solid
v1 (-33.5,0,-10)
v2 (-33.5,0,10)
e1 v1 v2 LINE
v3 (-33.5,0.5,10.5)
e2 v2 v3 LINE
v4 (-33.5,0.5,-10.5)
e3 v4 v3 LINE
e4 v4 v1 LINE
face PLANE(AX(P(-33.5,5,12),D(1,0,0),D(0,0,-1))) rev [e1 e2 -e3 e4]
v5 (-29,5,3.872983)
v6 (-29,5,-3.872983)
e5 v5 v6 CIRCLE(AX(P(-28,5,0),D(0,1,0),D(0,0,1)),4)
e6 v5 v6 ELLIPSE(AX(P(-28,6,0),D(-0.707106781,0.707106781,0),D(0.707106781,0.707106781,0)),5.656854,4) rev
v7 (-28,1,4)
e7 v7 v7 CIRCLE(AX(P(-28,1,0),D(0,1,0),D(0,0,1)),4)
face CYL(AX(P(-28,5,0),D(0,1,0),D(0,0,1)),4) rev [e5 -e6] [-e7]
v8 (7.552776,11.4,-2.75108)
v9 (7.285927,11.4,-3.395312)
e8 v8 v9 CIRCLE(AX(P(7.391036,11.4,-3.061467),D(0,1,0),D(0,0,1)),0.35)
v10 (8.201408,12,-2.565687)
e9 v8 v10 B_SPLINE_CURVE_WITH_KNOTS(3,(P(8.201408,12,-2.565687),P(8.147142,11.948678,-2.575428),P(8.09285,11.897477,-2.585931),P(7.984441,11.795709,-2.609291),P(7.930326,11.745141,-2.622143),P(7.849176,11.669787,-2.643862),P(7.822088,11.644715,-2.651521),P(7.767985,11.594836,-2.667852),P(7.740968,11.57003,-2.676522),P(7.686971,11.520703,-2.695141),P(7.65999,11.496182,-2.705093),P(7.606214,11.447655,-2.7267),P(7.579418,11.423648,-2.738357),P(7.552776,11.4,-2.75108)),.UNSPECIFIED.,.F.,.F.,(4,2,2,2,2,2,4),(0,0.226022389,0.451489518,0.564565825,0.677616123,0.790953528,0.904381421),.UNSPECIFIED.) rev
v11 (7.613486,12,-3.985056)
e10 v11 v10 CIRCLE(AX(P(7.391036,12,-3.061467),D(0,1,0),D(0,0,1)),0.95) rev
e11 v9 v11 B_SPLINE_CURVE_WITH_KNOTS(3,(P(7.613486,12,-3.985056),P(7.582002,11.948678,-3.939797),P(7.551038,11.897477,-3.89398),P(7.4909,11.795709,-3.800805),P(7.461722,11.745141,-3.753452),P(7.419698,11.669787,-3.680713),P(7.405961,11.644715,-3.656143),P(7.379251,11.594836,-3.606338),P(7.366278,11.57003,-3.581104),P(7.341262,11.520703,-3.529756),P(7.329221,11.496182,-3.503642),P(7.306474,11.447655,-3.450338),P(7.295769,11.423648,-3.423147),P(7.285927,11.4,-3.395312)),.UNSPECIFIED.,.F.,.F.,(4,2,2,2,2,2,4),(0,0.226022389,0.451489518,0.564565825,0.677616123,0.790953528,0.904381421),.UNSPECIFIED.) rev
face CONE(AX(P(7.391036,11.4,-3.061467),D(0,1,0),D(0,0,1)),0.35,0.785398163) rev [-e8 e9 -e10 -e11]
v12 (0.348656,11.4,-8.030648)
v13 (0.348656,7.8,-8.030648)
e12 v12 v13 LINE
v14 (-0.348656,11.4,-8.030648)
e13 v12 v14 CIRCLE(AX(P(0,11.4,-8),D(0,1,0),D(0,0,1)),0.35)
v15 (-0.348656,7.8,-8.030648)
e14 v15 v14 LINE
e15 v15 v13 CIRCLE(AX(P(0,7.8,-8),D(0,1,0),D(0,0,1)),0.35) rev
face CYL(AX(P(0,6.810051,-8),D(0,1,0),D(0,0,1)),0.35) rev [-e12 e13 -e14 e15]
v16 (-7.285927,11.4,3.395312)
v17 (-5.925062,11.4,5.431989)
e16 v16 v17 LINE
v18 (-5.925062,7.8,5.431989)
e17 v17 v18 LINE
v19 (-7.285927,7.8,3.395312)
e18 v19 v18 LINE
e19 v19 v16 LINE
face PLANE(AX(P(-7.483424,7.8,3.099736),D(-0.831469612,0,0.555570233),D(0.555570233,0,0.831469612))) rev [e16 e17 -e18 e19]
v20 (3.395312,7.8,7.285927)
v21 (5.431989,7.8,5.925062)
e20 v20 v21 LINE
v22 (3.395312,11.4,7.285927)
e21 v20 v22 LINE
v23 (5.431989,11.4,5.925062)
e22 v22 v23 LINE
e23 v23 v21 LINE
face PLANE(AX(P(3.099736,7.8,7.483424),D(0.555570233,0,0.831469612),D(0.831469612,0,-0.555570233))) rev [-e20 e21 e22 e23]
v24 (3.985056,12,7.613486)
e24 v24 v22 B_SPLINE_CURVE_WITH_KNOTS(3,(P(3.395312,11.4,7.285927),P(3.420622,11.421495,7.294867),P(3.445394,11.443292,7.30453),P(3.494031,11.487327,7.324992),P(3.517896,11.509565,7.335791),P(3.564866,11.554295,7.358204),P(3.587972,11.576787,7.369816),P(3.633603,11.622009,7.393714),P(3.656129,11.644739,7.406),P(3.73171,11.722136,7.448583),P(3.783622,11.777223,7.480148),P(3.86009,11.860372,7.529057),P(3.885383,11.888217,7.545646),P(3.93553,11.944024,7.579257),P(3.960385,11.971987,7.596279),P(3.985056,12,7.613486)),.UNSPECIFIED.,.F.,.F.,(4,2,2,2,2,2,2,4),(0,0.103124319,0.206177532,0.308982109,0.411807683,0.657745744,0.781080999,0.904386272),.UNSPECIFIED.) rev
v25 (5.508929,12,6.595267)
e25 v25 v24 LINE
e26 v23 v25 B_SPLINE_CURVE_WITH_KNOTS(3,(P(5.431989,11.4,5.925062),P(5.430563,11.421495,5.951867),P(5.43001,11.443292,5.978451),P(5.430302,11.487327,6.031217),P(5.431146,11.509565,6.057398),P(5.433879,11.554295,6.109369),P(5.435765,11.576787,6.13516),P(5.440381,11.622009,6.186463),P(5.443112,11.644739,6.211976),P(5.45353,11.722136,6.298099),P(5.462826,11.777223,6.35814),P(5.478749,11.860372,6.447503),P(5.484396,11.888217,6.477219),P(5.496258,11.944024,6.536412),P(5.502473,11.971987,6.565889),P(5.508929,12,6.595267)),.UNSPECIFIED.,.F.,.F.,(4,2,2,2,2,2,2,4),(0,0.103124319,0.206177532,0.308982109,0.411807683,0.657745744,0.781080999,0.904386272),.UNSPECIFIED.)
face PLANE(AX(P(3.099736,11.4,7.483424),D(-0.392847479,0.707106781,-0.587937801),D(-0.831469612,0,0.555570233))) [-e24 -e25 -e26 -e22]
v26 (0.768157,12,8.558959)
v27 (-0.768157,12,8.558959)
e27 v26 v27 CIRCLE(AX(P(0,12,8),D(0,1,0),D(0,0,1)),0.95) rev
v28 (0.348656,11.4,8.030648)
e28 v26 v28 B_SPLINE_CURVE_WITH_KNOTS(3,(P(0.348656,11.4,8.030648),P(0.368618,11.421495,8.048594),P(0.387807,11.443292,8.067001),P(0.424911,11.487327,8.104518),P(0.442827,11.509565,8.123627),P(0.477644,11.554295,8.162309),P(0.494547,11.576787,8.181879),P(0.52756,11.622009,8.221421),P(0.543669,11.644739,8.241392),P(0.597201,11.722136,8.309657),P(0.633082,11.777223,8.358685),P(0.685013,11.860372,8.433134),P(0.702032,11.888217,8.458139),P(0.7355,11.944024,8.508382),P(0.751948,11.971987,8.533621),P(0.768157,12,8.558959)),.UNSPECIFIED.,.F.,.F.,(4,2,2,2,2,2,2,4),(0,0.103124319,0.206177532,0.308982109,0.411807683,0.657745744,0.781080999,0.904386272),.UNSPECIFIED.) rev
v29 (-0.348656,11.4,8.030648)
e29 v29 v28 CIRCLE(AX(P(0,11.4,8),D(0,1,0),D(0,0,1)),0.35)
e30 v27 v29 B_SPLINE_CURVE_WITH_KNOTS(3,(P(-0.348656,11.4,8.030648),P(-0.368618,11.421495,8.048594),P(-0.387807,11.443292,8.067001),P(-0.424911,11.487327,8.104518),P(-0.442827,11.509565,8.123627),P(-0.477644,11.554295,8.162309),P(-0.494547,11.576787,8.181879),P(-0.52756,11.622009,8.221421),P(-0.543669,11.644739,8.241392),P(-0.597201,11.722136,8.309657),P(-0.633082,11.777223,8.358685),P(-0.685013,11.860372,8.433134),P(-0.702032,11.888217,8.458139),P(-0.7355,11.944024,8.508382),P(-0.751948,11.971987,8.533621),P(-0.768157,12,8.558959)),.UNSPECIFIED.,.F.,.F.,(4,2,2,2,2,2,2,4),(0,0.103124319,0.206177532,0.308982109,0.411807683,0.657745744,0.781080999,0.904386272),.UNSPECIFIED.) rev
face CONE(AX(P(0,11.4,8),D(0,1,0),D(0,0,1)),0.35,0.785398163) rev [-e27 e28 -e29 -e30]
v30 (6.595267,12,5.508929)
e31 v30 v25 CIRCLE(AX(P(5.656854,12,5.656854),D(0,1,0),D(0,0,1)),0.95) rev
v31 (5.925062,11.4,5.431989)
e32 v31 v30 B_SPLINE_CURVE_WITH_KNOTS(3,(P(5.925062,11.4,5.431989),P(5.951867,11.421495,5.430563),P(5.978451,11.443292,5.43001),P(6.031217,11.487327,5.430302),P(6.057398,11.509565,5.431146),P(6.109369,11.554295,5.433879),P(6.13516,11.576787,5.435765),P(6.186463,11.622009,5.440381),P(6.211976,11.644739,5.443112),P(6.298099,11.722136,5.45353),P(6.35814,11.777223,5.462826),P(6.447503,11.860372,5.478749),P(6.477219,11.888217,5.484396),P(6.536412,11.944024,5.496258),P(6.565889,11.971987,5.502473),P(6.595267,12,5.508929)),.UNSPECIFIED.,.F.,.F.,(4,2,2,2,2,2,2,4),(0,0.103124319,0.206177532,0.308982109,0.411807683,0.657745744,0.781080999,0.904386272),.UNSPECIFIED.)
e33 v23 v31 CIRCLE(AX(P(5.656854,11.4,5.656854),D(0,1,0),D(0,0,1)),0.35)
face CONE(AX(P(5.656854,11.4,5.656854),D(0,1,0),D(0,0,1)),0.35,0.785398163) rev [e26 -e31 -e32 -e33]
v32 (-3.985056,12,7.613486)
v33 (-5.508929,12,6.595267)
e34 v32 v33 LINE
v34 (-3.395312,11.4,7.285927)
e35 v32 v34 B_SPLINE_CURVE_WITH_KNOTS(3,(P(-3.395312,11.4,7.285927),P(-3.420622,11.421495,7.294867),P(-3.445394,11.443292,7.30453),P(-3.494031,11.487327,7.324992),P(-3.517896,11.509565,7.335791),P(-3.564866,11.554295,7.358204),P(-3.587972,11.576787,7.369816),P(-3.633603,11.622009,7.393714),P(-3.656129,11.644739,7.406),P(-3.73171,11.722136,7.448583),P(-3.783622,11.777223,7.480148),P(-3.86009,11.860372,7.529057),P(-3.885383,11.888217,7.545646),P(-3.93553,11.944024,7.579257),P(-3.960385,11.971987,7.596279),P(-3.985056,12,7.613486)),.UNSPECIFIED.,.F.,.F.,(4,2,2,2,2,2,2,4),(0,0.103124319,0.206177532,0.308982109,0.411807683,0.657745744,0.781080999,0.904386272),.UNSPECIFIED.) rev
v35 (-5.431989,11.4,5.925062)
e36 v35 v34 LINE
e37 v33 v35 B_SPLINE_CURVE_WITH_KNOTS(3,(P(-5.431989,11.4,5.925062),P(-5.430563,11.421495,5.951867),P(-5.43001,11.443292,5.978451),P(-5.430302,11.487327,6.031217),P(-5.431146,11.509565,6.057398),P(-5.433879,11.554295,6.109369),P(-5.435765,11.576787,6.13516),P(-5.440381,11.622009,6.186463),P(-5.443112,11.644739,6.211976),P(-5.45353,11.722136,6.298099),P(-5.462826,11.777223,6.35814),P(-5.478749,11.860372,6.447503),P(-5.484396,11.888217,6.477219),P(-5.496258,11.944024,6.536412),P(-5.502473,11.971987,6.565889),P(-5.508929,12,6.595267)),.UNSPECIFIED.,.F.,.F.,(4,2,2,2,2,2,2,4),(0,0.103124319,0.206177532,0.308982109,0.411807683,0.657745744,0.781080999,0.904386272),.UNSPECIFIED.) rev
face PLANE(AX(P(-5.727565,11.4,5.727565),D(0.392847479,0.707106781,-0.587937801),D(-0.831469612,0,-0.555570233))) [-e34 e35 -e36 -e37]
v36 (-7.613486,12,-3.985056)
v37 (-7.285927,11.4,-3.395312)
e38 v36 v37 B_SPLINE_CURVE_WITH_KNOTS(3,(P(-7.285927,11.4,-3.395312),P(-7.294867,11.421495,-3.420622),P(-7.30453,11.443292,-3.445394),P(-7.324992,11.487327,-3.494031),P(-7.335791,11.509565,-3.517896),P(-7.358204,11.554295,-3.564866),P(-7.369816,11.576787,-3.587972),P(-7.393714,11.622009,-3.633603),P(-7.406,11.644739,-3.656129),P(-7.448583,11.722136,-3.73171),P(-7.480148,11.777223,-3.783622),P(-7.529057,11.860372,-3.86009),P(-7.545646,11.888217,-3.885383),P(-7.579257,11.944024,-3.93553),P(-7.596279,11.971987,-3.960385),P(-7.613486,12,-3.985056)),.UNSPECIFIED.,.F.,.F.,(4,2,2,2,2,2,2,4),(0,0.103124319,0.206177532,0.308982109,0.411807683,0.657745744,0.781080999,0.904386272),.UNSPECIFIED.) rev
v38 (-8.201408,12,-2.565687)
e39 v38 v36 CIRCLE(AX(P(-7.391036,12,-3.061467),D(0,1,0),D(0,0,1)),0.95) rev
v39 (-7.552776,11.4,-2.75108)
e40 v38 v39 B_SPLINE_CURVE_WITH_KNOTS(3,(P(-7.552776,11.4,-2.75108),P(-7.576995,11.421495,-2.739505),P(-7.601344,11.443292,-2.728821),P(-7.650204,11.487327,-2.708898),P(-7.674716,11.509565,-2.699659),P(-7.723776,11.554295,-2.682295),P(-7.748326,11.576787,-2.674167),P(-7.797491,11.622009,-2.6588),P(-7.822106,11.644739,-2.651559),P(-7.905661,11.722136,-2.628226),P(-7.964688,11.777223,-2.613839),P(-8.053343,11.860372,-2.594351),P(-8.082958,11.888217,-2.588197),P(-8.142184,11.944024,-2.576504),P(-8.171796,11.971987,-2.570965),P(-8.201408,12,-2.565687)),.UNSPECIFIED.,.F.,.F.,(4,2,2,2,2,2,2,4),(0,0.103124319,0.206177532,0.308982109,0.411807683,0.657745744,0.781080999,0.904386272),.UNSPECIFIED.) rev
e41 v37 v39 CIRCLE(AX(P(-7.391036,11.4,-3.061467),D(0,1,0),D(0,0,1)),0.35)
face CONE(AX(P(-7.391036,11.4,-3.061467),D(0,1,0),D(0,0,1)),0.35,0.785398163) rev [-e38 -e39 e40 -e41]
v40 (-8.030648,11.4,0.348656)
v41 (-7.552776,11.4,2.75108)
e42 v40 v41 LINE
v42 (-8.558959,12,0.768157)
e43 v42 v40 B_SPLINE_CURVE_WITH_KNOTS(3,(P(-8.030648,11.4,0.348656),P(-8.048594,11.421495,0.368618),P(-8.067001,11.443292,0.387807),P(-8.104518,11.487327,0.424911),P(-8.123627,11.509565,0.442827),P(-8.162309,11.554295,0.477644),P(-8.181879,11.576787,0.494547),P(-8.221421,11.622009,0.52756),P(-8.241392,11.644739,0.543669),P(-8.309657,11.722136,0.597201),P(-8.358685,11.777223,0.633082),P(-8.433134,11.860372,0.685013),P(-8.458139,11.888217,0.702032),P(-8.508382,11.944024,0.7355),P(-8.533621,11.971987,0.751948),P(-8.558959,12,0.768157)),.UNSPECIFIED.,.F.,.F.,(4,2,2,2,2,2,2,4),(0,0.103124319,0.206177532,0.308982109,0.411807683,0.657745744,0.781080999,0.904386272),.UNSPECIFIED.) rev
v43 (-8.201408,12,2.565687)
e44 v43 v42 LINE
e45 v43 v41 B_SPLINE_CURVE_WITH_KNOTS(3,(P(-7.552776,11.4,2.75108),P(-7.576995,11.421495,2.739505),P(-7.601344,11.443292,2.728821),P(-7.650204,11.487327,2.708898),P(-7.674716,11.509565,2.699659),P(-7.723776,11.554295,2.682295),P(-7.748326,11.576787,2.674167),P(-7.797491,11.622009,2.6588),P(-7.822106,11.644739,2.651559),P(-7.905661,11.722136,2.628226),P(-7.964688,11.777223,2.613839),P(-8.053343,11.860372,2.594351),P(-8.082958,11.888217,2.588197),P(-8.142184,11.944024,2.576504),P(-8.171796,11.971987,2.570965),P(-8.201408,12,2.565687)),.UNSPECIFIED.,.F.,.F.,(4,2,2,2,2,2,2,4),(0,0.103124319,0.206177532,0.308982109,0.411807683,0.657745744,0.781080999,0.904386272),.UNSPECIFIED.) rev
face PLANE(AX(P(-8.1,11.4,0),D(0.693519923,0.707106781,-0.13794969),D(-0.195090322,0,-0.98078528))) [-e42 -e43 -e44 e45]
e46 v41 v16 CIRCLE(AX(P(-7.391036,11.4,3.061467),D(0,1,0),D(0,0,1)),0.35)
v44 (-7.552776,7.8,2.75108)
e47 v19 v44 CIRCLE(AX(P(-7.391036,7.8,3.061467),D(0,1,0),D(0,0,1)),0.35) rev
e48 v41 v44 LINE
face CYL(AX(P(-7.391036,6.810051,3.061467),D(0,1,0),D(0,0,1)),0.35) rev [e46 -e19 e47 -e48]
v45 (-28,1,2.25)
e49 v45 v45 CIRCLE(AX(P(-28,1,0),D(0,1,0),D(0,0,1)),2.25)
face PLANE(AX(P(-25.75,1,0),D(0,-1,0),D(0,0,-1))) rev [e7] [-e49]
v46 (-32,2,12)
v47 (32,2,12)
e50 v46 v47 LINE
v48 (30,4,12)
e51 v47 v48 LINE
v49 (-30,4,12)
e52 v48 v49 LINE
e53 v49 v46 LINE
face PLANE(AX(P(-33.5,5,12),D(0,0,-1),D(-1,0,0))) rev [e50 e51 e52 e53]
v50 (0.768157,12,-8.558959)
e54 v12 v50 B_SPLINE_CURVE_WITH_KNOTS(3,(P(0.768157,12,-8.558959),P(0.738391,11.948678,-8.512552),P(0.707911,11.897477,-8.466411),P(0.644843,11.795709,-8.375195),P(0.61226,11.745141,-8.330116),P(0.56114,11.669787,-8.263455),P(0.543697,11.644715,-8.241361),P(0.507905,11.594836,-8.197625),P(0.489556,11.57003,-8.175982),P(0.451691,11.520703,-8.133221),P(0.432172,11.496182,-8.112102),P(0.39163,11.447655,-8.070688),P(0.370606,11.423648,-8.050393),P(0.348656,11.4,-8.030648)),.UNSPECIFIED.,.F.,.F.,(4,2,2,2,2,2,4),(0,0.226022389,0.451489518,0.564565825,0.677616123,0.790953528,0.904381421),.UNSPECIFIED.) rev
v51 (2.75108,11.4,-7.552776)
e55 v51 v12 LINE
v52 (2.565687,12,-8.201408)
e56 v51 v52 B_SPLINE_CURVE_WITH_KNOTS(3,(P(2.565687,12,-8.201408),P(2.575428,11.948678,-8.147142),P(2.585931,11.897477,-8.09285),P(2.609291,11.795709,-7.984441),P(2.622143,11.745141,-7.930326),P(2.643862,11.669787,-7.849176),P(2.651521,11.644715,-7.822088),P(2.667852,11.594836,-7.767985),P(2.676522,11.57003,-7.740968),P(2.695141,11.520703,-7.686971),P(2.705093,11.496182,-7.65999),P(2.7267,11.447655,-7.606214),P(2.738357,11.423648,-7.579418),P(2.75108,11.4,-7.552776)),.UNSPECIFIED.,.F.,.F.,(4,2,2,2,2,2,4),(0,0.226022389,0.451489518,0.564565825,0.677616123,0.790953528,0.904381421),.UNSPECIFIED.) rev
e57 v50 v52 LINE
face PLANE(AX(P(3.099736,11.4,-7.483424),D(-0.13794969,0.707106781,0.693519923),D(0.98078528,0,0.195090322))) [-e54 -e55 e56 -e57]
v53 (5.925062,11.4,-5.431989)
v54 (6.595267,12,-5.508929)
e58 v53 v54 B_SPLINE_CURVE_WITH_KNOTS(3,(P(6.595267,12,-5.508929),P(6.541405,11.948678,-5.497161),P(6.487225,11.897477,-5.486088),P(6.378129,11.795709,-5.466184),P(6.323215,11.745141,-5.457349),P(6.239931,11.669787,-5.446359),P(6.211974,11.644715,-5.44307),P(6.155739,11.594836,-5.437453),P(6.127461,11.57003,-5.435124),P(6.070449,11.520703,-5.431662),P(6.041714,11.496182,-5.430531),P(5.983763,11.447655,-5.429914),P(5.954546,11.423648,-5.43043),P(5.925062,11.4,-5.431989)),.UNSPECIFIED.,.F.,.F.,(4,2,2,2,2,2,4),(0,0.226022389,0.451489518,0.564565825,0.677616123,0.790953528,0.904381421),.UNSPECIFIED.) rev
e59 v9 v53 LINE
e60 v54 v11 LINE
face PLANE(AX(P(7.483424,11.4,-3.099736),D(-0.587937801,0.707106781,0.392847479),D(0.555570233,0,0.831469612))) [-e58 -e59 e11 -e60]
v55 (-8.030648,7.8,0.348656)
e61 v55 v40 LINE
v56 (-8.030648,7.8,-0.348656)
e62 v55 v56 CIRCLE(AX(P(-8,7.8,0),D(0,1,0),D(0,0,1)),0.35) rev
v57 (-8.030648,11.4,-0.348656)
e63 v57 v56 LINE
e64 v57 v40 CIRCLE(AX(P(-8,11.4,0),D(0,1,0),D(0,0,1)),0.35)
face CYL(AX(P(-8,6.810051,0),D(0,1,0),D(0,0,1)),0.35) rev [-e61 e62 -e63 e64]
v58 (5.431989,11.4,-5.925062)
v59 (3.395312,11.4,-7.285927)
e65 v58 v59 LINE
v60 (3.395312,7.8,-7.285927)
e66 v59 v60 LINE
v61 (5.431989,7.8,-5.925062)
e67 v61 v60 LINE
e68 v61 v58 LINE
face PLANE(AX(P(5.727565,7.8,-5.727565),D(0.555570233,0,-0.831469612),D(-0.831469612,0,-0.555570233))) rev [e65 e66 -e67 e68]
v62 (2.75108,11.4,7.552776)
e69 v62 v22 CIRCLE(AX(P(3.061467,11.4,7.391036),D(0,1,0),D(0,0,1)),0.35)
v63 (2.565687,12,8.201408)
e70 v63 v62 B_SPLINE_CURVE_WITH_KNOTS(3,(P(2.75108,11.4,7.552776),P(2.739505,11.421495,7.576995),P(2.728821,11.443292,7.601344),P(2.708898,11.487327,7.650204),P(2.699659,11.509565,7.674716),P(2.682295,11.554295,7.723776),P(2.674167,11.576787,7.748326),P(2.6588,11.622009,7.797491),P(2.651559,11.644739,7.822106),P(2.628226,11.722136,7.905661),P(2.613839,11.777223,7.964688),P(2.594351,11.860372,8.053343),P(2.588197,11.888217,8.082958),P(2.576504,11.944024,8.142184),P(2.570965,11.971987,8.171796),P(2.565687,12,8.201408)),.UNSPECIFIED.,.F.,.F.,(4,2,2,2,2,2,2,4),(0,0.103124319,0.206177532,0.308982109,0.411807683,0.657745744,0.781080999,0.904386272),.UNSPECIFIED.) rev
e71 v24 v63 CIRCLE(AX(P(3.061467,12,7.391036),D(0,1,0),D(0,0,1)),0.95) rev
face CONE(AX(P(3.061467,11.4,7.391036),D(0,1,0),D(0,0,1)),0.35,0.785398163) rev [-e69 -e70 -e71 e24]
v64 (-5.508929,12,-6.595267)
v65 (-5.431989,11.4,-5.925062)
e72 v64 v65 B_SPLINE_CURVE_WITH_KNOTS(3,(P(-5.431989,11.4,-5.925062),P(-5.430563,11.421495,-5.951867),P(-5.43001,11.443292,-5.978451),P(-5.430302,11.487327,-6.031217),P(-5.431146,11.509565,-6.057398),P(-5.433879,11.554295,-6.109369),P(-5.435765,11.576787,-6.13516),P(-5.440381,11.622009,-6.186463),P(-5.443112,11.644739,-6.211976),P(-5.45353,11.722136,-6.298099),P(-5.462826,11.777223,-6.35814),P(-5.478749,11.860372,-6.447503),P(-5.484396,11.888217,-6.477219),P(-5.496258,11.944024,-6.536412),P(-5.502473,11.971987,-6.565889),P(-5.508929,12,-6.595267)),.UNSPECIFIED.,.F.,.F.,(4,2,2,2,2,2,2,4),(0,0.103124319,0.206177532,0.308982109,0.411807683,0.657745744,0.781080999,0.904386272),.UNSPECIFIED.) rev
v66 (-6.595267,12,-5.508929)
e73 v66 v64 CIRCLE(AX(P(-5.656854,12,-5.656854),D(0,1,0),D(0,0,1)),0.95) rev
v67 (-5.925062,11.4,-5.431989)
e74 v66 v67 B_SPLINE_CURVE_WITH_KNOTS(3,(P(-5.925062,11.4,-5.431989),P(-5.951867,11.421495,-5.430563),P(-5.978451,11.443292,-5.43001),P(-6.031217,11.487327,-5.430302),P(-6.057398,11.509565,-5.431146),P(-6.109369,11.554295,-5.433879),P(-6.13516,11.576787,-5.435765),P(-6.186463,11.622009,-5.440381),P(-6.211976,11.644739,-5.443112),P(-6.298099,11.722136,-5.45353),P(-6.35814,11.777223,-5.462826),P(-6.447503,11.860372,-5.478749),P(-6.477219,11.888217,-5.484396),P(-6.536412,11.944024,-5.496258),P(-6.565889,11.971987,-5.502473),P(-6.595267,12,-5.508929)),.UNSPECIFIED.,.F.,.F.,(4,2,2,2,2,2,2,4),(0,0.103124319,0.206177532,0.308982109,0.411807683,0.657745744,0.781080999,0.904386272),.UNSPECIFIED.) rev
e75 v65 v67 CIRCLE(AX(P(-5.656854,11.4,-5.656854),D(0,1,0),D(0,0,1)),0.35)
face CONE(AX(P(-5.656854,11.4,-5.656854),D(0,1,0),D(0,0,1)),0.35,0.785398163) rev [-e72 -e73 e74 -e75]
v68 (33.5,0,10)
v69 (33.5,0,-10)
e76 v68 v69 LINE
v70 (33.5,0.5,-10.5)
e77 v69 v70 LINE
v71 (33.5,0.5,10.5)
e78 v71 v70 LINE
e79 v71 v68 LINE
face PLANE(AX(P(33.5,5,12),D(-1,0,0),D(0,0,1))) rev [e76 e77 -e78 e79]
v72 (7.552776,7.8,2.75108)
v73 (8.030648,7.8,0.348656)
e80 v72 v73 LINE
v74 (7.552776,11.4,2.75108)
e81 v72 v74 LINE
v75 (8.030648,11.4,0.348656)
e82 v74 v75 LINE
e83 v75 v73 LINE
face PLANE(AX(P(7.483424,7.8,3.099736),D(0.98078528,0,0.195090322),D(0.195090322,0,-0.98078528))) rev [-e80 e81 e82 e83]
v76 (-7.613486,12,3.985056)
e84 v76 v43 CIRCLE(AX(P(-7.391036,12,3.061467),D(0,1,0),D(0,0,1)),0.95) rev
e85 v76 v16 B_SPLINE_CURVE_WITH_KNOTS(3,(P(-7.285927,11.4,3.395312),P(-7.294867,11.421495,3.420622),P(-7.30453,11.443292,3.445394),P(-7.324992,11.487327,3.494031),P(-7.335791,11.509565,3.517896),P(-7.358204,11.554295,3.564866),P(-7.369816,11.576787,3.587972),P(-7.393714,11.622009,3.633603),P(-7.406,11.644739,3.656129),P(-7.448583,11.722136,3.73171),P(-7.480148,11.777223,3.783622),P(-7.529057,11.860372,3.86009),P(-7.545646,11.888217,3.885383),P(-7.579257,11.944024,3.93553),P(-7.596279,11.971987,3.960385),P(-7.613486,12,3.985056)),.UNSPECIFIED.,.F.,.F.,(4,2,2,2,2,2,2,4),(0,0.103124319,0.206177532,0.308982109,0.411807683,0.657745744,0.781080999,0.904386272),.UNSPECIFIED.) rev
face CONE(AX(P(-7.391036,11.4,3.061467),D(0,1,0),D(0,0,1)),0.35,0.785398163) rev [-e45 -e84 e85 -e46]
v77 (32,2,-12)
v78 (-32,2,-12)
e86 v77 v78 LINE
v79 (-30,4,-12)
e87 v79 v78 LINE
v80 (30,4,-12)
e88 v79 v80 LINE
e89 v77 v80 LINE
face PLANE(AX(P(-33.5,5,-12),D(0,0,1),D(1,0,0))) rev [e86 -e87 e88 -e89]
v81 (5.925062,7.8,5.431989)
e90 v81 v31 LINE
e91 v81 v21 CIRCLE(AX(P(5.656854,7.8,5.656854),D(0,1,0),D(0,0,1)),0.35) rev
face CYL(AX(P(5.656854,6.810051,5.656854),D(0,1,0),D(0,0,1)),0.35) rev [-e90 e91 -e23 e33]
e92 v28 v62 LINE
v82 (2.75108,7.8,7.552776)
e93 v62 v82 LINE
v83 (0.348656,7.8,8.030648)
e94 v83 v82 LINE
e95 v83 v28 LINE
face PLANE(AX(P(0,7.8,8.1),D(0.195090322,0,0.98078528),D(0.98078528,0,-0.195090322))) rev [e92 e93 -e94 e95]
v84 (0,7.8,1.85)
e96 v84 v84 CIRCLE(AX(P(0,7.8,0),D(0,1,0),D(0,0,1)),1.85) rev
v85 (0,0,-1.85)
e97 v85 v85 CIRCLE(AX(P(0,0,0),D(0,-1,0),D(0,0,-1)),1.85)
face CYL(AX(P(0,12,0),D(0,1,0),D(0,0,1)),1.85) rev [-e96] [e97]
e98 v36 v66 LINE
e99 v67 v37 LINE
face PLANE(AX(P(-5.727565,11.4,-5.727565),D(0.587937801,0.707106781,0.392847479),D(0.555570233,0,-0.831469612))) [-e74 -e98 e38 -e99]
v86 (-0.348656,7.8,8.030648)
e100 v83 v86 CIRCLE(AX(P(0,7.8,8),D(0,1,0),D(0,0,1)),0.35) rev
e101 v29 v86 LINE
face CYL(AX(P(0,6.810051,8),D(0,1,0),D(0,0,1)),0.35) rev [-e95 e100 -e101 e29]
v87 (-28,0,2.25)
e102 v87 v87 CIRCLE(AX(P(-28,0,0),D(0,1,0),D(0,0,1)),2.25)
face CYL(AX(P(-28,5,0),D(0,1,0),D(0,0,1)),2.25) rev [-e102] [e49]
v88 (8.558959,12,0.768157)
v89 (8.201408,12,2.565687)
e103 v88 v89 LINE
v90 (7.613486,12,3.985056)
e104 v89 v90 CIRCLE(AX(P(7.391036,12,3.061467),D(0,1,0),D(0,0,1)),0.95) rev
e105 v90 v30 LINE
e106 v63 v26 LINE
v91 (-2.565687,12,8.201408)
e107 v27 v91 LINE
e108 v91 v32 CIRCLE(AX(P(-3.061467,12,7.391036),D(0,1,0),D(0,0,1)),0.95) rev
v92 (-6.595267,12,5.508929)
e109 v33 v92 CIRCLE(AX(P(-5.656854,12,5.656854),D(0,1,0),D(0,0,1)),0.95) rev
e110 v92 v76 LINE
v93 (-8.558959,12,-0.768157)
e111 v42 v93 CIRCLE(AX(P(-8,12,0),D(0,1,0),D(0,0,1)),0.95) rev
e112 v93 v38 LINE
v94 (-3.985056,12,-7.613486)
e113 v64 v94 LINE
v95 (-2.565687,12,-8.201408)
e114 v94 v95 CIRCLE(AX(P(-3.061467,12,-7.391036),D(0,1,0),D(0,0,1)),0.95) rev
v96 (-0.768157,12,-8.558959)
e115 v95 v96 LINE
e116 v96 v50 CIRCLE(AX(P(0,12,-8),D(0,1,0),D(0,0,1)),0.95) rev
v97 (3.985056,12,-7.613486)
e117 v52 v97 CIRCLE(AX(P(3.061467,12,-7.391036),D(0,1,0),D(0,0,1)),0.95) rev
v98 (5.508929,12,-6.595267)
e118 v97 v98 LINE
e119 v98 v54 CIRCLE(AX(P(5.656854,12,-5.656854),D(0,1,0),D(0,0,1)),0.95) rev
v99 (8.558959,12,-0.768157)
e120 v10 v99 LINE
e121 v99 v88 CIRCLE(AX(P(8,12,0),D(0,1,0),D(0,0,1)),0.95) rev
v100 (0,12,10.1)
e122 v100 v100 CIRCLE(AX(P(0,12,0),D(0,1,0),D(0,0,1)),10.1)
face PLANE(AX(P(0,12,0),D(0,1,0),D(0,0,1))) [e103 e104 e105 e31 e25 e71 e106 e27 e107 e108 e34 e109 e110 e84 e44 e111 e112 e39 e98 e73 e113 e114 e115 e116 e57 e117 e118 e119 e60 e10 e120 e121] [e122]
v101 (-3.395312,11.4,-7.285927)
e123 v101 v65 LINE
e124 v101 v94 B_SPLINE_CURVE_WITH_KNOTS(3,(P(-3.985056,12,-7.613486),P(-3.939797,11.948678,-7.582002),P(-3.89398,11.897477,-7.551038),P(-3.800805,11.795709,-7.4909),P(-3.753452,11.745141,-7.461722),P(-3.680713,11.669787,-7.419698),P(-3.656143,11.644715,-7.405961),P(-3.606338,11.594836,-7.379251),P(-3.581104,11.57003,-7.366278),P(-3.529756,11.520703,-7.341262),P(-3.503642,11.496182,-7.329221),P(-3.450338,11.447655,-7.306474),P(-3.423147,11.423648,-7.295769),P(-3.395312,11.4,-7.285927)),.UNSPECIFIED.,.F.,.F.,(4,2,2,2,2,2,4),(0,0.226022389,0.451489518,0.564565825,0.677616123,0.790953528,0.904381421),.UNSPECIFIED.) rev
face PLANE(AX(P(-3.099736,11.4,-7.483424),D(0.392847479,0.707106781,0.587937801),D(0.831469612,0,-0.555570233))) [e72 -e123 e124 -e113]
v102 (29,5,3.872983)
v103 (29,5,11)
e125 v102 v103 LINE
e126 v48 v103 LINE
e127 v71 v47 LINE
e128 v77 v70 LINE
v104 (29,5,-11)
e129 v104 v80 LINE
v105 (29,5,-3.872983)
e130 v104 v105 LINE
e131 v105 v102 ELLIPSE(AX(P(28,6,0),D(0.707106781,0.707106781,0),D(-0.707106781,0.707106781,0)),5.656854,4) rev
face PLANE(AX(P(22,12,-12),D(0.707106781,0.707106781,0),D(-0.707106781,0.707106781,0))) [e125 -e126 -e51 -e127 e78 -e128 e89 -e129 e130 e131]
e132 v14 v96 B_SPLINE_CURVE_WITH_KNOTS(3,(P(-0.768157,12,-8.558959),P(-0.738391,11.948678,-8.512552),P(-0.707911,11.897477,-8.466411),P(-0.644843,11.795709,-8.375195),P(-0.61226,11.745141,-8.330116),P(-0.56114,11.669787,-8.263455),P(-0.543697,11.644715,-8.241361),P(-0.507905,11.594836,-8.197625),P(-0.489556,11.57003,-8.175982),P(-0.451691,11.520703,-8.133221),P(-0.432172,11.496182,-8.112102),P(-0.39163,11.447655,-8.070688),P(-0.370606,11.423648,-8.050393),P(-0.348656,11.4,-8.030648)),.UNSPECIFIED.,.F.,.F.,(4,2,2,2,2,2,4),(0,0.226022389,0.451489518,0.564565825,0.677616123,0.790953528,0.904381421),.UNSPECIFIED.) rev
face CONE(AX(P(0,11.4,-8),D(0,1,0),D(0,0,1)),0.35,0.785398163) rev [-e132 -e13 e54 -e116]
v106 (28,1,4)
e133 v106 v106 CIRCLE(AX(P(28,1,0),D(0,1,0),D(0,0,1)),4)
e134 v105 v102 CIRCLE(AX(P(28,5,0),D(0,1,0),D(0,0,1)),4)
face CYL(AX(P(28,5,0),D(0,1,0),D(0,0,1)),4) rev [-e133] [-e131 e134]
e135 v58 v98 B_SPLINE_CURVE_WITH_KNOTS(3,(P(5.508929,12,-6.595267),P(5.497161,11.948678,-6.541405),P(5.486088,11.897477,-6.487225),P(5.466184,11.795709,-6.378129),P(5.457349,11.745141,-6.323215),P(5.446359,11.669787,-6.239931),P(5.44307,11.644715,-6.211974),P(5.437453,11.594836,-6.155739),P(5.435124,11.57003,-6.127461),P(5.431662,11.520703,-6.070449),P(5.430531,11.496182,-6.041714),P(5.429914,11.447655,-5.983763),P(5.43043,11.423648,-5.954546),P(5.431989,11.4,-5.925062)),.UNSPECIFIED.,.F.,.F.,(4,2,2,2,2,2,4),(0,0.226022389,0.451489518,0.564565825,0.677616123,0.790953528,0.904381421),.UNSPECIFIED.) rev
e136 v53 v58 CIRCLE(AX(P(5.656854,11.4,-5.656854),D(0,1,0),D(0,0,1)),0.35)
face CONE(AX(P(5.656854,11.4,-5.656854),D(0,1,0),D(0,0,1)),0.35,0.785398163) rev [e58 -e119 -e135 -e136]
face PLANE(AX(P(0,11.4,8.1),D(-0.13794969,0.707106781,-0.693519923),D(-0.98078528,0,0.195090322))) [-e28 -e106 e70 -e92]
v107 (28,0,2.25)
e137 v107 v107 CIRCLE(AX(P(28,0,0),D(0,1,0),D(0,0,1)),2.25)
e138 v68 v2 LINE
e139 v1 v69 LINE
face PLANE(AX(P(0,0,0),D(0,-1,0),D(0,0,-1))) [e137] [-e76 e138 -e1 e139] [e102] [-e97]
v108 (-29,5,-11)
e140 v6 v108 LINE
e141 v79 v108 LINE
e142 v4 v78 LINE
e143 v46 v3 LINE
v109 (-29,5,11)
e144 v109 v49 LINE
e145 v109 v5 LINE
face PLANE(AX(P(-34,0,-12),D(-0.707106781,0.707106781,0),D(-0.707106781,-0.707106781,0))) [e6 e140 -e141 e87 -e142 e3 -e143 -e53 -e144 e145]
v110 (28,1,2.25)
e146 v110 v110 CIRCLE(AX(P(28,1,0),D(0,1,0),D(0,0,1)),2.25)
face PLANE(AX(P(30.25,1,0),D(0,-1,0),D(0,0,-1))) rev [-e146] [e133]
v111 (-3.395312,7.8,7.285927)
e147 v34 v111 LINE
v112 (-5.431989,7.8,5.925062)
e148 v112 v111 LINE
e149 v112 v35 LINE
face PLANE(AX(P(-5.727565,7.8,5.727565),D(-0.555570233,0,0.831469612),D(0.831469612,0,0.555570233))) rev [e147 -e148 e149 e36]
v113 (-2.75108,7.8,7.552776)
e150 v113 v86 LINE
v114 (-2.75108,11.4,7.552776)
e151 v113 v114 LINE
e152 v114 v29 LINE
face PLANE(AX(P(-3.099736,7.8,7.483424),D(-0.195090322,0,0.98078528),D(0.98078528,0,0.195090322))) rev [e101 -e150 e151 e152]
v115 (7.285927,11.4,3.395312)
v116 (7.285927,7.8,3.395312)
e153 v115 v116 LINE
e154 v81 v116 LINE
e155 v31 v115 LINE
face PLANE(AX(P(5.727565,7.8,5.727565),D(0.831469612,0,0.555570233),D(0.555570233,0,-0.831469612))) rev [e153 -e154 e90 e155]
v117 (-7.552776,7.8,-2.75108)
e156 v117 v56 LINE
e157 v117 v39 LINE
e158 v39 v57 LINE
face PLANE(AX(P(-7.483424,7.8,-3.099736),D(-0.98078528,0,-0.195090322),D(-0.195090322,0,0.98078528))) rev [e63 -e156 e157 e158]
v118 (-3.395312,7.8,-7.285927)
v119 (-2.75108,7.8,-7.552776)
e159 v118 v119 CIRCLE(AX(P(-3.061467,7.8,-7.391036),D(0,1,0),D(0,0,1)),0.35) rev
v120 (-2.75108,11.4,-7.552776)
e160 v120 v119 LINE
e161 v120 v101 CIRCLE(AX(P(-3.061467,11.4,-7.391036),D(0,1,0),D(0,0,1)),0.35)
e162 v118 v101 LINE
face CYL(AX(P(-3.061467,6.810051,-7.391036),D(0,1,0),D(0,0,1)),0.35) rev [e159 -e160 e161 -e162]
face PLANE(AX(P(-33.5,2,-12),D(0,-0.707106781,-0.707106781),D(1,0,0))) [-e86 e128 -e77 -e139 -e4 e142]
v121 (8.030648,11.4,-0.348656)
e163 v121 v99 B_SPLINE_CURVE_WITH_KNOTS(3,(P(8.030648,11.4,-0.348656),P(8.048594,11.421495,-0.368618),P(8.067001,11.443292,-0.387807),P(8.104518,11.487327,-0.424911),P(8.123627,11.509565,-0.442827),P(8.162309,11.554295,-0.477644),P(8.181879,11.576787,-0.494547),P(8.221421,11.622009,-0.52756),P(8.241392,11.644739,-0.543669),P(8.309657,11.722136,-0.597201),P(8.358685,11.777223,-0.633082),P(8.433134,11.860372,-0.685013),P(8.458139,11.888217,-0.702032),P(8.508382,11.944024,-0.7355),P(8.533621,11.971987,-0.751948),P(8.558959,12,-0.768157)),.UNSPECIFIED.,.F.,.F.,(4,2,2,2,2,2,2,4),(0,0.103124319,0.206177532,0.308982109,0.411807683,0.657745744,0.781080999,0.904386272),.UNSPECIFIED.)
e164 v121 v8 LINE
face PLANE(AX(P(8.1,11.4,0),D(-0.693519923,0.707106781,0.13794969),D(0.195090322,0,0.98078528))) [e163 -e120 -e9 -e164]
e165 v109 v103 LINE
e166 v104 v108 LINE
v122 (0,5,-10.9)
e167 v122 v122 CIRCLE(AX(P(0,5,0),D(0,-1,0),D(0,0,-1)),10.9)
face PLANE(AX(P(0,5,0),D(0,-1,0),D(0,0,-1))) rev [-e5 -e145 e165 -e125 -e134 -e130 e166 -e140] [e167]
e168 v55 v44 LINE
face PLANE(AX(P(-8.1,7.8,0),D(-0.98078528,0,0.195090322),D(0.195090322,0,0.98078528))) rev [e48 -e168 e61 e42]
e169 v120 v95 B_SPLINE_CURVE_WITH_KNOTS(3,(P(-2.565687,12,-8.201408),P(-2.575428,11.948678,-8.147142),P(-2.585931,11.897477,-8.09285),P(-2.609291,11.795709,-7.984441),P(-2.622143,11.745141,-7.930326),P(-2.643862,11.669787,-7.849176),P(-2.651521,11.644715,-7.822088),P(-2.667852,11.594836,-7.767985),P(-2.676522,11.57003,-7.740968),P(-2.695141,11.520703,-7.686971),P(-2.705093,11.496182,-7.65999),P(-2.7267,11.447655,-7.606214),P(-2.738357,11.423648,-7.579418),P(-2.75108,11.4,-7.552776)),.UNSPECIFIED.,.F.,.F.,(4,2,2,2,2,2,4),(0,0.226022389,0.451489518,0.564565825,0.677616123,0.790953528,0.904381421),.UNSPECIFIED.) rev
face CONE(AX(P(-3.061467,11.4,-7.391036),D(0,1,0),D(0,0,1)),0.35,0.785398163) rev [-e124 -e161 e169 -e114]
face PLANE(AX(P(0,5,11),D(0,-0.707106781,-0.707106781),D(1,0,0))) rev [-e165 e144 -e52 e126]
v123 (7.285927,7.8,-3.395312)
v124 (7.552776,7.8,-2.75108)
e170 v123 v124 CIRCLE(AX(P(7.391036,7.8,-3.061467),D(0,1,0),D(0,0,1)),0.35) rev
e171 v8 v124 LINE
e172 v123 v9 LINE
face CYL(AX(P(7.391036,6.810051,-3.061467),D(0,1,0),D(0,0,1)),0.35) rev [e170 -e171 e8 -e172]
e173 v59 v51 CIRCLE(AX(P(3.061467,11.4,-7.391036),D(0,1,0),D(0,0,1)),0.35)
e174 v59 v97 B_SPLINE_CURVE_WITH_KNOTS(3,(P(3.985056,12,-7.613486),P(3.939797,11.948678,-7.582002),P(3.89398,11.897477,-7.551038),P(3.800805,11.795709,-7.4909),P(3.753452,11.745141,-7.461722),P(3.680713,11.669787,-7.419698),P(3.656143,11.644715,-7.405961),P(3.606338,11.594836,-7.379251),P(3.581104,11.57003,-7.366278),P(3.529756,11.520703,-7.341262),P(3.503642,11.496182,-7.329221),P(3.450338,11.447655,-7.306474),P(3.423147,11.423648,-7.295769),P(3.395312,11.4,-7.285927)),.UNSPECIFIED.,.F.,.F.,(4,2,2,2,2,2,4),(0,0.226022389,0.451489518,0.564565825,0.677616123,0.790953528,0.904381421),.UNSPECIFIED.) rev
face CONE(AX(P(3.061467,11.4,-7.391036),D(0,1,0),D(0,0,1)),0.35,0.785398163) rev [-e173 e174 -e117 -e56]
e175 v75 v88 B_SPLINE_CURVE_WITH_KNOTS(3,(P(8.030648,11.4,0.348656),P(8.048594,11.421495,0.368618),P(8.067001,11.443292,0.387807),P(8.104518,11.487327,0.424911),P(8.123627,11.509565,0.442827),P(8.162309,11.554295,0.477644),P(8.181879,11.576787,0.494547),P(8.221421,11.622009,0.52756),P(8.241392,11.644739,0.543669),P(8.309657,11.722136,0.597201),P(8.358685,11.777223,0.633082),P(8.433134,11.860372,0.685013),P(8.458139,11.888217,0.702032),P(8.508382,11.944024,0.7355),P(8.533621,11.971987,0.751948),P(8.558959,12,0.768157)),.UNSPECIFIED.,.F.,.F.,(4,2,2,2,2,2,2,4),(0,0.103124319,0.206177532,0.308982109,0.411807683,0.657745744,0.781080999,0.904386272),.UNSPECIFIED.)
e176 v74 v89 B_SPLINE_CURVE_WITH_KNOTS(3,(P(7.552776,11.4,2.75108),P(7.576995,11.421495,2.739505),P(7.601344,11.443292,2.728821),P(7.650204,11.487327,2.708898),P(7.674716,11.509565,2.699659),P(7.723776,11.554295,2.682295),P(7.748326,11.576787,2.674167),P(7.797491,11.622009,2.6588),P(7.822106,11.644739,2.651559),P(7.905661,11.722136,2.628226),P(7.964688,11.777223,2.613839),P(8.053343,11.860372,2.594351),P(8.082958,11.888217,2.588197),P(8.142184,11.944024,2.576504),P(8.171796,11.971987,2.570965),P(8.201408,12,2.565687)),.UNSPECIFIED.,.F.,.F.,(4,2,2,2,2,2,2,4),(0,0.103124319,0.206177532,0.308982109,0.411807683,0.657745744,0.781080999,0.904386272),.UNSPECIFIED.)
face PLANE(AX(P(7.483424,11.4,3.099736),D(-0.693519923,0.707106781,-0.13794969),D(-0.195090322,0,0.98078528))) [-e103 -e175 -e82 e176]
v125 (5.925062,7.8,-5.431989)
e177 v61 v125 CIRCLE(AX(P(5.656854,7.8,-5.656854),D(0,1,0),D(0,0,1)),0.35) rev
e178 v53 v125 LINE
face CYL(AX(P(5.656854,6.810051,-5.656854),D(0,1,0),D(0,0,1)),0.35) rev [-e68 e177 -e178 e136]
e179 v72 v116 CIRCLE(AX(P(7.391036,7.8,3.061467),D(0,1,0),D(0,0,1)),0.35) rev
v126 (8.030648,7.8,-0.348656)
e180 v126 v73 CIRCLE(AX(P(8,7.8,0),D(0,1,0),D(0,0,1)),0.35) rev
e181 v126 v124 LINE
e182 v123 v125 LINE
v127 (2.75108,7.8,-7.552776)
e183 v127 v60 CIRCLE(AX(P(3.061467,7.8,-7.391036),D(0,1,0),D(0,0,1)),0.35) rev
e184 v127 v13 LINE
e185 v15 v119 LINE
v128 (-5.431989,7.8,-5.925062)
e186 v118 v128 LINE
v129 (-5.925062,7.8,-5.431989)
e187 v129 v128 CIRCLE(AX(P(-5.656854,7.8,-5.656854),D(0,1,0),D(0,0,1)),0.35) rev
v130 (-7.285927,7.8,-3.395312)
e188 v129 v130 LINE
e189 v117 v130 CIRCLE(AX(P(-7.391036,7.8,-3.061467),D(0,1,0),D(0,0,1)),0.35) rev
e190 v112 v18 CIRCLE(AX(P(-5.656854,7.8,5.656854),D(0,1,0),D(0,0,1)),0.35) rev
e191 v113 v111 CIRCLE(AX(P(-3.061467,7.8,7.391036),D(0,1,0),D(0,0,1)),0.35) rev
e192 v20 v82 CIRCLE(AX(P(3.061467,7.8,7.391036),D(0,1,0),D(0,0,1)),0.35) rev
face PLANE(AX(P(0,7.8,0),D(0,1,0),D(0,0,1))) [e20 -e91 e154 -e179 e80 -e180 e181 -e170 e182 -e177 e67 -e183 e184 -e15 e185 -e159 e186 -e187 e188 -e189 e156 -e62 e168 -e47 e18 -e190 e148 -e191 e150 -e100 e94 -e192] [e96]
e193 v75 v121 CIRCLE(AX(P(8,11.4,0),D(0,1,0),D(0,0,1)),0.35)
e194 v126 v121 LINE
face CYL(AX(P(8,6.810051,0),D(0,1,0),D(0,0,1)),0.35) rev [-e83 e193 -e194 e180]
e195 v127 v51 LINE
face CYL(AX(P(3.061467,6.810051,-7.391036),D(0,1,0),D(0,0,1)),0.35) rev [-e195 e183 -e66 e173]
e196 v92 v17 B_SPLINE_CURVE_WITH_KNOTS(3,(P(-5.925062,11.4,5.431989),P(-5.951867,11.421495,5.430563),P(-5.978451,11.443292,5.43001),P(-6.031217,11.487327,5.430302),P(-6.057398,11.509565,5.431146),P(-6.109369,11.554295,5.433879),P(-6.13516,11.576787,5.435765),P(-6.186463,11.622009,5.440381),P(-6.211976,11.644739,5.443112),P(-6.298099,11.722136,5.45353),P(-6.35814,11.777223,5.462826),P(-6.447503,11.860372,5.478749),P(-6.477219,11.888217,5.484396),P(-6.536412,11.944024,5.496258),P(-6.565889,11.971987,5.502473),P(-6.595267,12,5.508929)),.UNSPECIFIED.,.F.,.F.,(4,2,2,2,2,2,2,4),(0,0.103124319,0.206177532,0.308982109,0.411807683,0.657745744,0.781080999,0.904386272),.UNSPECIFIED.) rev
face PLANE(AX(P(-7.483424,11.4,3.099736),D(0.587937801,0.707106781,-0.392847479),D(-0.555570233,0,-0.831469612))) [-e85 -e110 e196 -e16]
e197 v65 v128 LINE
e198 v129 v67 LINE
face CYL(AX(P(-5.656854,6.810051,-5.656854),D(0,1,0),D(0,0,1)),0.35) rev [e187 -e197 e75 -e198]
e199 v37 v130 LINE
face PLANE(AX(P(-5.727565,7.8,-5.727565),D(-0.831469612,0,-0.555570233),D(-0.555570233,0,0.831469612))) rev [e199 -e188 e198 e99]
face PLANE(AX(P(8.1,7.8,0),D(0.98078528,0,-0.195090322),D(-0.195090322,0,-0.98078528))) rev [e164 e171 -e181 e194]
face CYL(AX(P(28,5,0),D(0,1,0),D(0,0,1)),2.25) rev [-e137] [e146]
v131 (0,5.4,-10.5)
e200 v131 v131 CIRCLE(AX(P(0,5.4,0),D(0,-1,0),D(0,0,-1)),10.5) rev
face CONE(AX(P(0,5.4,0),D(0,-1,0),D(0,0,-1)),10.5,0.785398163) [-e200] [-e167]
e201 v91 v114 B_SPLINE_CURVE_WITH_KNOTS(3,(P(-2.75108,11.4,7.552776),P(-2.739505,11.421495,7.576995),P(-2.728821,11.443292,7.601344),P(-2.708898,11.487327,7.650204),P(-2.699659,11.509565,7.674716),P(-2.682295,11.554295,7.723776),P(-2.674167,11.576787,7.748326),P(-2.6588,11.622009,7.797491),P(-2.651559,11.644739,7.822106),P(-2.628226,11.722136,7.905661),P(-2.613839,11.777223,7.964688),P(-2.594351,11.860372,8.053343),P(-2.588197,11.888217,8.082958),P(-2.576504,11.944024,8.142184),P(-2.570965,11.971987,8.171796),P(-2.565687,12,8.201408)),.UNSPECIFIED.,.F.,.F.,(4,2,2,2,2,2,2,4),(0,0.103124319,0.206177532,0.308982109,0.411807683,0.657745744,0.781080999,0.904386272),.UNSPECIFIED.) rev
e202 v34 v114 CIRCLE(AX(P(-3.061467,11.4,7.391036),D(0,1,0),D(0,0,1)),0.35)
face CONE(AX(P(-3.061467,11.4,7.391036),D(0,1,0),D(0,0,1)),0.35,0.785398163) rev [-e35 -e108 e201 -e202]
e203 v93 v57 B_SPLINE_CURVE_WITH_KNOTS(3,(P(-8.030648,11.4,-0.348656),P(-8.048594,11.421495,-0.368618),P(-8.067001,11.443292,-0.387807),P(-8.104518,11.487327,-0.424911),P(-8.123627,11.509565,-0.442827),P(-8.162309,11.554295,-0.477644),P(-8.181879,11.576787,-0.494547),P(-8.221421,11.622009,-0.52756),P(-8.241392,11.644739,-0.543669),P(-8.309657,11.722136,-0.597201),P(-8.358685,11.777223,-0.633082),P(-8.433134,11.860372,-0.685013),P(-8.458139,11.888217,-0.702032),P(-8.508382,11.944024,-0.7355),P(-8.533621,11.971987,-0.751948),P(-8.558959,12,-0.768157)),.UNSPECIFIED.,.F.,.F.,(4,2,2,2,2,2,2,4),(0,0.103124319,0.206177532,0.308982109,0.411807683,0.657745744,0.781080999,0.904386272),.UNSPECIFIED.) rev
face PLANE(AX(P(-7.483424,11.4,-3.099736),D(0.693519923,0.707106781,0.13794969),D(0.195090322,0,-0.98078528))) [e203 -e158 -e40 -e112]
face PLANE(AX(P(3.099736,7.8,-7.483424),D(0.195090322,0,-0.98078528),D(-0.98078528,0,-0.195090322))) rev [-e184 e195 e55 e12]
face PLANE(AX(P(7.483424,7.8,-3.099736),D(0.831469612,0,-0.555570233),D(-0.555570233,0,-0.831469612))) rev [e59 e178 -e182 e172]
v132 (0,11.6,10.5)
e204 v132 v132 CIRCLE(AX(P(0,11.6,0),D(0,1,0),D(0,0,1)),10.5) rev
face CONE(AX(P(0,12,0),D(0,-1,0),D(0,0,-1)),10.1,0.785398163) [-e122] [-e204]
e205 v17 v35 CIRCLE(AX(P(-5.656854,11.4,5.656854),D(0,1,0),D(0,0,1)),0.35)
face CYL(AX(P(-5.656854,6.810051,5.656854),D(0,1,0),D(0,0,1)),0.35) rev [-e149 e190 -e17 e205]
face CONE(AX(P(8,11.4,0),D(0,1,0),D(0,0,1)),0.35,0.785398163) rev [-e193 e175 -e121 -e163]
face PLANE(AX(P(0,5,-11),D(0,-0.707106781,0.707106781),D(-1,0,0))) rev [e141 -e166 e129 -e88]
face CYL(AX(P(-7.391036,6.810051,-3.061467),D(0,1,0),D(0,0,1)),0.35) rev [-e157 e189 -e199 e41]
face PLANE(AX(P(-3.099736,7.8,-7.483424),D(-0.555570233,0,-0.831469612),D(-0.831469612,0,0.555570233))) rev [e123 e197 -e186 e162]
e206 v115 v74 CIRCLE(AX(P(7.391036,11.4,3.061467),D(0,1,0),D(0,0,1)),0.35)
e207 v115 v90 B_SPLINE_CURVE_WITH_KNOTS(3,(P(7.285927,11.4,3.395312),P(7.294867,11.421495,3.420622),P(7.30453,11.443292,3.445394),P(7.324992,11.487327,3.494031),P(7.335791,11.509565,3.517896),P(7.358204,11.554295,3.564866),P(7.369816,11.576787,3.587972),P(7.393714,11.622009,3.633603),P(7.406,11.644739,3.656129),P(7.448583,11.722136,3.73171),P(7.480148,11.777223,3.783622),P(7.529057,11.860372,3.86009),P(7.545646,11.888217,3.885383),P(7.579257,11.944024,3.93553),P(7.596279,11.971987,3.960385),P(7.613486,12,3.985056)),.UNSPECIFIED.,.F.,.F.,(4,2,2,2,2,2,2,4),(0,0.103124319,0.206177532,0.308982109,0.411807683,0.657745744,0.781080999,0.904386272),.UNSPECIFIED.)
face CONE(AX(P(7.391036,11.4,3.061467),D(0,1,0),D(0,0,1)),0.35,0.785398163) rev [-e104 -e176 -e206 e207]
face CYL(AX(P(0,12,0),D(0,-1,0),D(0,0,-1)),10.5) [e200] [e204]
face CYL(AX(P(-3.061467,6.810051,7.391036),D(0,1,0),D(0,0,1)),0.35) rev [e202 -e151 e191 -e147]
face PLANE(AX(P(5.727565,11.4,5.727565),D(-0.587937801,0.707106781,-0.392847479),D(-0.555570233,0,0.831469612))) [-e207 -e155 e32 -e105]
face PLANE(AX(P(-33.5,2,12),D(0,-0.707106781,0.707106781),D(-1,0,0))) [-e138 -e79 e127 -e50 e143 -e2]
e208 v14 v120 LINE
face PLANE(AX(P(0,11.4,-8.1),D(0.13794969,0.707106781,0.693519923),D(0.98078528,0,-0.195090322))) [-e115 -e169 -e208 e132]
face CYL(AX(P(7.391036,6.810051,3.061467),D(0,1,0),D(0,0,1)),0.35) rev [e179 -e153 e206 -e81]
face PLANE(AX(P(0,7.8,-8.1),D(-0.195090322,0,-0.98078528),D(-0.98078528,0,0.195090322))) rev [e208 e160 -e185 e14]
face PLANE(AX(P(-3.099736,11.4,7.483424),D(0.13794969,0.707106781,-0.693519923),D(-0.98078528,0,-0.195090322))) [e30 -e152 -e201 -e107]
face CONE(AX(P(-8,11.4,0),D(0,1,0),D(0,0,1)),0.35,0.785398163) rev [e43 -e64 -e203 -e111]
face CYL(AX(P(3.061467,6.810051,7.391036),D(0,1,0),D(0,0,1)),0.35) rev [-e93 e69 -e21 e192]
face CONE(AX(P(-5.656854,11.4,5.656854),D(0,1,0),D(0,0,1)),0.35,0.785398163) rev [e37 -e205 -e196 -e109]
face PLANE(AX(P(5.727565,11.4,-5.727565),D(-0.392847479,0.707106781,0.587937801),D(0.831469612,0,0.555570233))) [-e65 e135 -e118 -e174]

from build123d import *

# Parameters (mm, degrees)
SKETCH1_W                      = 67
SKETCH1_H                      = 24
BOSS_EXTRUDE1_DEPTH            = 5
SKETCH2_R                      = 10.5
BOSS_EXTRUDE2_DEPTH            = 7
CBORE_START                    = 1
CBORE_FOR_M4_SHCS1_OUTLINE_R   = 4
CBORE_FOR_M4_SHCS1_DEPTH       = 4
CBORE_FOR_M4_SHCS1_2_OUTLINE_R = 2.25
CBORE_FOR_M4_SHCS1_2_DEPTH     = 1
CHAMFER1_SIZE                  = 1
CHAMFER2_SIZE                  = 2
SKETCH5_OUTSIDE_W              = 83.434
SKETCH5_OUTSIDE_H              = 28.434
CUT_EXTRUDE1_DEPTH             = 43.921439864
SKETCH6_R                      = 10.5
BOSS_EXTRUDE3_DEPTH            = 7
CHAMFER4_SIZE                  = 0.4
HOLE1_D                        = 3.7
HOLE1_DEPTH                    = 16
HOLE1_TIP                      = 1.85
CUT_EXTRUDE2_DEPTH             = 4.2
SKETCH12_R                     = 0.35
CUT_EXTRUDE3_DEPTH             = 4.2
CHAMFER5_SIZE                  = 0.6


# Read off the part's stored shape, not the designer's step: CBORE for M4 SHCS1
with BuildPart() as part:
    # Sketch1 → Boss-Extrude1 (new body)
    with BuildSketch(Plane(origin=(0, 0, 0), x_dir=(1, 0, 0), z_dir=(0, 1, 0))):
        Rectangle(SKETCH1_W, SKETCH1_H)
    extrude(amount=BOSS_EXTRUDE1_DEPTH)

    # Sketch2 → Boss-Extrude2 (add)
    with BuildSketch(Plane(origin=(0, 5, 0), x_dir=(1, 0, 0), z_dir=(0, 1, 0))):
        with Locations(Location((0, 0, 0), (0, 0, 270))):
            Circle(SKETCH2_R)
    extrude(amount=BOSS_EXTRUDE2_DEPTH)

    # CBORE for M4 SHCS1 outline → CBORE for M4 SHCS1 (cut)
    with BuildSketch(Plane(origin=(0, 0, 0), x_dir=(1, 0, 0), z_dir=(0, 1, 0)).offset(CBORE_START)):
        with Locations((28, 0)):
            Circle(CBORE_FOR_M4_SHCS1_OUTLINE_R)
        with Locations((-28, 0)):
            Circle(CBORE_FOR_M4_SHCS1_OUTLINE_R)
    extrude(amount=CBORE_FOR_M4_SHCS1_DEPTH, mode=Mode.SUBTRACT)

    # CBORE for M4 SHCS1 2 outline → CBORE for M4 SHCS1 2 (cut)
    with BuildSketch(Plane(origin=(0, 0, 0), x_dir=(1, 0, 0), z_dir=(0, 1, 0))):
        with Locations((28, 0)):
            Circle(CBORE_FOR_M4_SHCS1_2_OUTLINE_R)
        with Locations((-28, 0)):
            Circle(CBORE_FOR_M4_SHCS1_2_OUTLINE_R)
    extrude(amount=CBORE_FOR_M4_SHCS1_2_DEPTH, mode=Mode.SUBTRACT)

    # Chamfer1
    chamfer1_edges = [part.edges().sort_by_distance(p)[0] for p in [
        (-33.5, 5, 0),
        (0, 5, 12),
        (33.5, 5, 0),
        (33.5, 2.5, 12),
        (-33.5, 2.5, 12),
        (-33.5, 2.5, -12),
        (33.5, 2.5, -12),
        (0, 5, -12),
    ]]
    chamfer(chamfer1_edges, length=CHAMFER1_SIZE)

    # Chamfer2
    chamfer2_edges = [part.edges().sort_by_distance(p)[0] for p in [
        (0, 0, -12),
        (0, 0, 12),
    ]]
    chamfer(chamfer2_edges, length=CHAMFER2_SIZE)

    # Sketch5 outside → Cut-Extrude1 (cut, through all)
    with BuildSketch(Plane.XY.offset(12)):
        with Locations((0, 6)):
            Rectangle(SKETCH5_OUTSIDE_W, SKETCH5_OUTSIDE_H)
        Polygon((-34, 0), (-22, 12), (22, 12), (34, 0), align=None, mode=Mode.SUBTRACT)
    extrude(amount=-CUT_EXTRUDE1_DEPTH, mode=Mode.SUBTRACT)

    # Sketch6 → Boss-Extrude3 (add)
    with BuildSketch(Plane(origin=(0, 5, 0), x_dir=(1, 0, 0), z_dir=(0, 1, 0))):
        with Locations(Location((0, 0, 0), (0, 0, 270))):
            Circle(SKETCH6_R)
    extrude(amount=BOSS_EXTRUDE3_DEPTH)

    # Chamfer4
    chamfer4_edges = [part.edges().sort_by_distance(p)[0] for p in [
        (0, 5, -10.5),
        (0, 12, -10.5),
    ]]
    chamfer(chamfer4_edges, length=CHAMFER4_SIZE)

    # Hole1
    with Locations(Plane(origin=(0, 12, 0), x_dir=(1, 0, 0), z_dir=(0, 1, 0))):
        with Locations((0, 0)):
            Hole(HOLE1_D / 2, depth=HOLE1_DEPTH)
            with Locations((0, 0, -(HOLE1_DEPTH + HOLE1_TIP / 2))):  # 90° drill point
                Cone(0, HOLE1_D / 2, HOLE1_TIP, mode=Mode.SUBTRACT)

    # Sketch11 → Cut-Extrude2 (cut)
    with BuildSketch(Plane(origin=(0, 12, 0), x_dir=(1, 0, 0), z_dir=(0, 1, 0))):
        Polygon((0, 8.1), (-3.099735802, 7.483424213), (-5.727564928, 5.727564928), (-7.483424213, 3.099735802), (-8.1, 0), (-7.483424213, -3.099735802), (-5.727564928, -5.727564928), (-3.099735802, -7.483424213), (0, -8.1), (3.099735802, -7.483424213), (5.727564928, -5.727564928), (7.483424213, -3.099735802), (8.1, 0), (7.483424213, 3.099735802), (5.727564928, 5.727564928), (3.099735802, 7.483424213), align=None)
    extrude(amount=-CUT_EXTRUDE2_DEPTH, mode=Mode.SUBTRACT)

    # Sketch12 → Cut-Extrude3 (cut)
    with BuildSketch(Plane(origin=(0, 12, 0), x_dir=(1, 0, 0), z_dir=(0, 1, 0))):
        with Locations((0, 8)):
            Circle(SKETCH12_R)
        with Locations((3.061467459, 7.39103626)):
            Circle(SKETCH12_R)
        with Locations((5.656854249, 5.656854249)):
            Circle(SKETCH12_R)
        with Locations((7.39103626, 3.061467459)):
            Circle(SKETCH12_R)
        with Locations((8, 0)):
            Circle(SKETCH12_R)
        with Locations((7.39103626, -3.061467459)):
            Circle(SKETCH12_R)
        with Locations((5.656854249, -5.656854249)):
            Circle(SKETCH12_R)
        with Locations((3.061467459, -7.39103626)):
            Circle(SKETCH12_R)
        with Locations((0, -8)):
            Circle(SKETCH12_R)
        with Locations((-3.061467459, -7.39103626)):
            Circle(SKETCH12_R)
        with Locations((-5.656854249, -5.656854249)):
            Circle(SKETCH12_R)
        with Locations((-7.39103626, -3.061467459)):
            Circle(SKETCH12_R)
        with Locations((-8, 0)):
            Circle(SKETCH12_R)
        with Locations((-7.39103626, 3.061467459)):
            Circle(SKETCH12_R)
        with Locations((-5.656854249, 5.656854249)):
            Circle(SKETCH12_R)
        with Locations((-3.061467459, 7.39103626)):
            Circle(SKETCH12_R)
    extrude(amount=-CUT_EXTRUDE3_DEPTH, mode=Mode.SUBTRACT)

    # Chamfer5
    chamfer5_edges = [part.edges().sort_by_distance(p)[0] for p in [
        (-1.549867901, 12, -7.791712107),
        (-4.413650365, 12, -6.60549457),
        (-6.60549457, 12, -4.413650365),
        (-7.791712107, 12, -1.549867901),
        (-7.791712107, 12, 1.549867901),
        (-6.60549457, 12, 4.413650365),
        (-4.413650365, 12, 6.60549457),
        (-1.549867901, 12, 7.791712107),
        (1.549867901, 12, 7.791712107),
        (4.413650365, 12, 6.60549457),
        (6.60549457, 12, 4.413650365),
        (7.791712107, 12, 1.549867901),
        (7.791712107, 12, -1.549867901),
        (6.60549457, 12, -4.413650365),
        (4.413650365, 12, -6.60549457),
        (1.549867901, 12, -7.791712107),
        (-3.19540666, 12, -7.714394096),
        (-5.904341623, 12, -5.904341623),
        (-7.714394096, 12, -3.19540666),
        (-8.35, 12, 0),
        (-7.714394096, 12, 3.19540666),
        (-5.904341623, 12, 5.904341623),
        (-3.19540666, 12, 7.714394096),
        (0, 12, 8.35),
        (3.19540666, 12, 7.714394096),
        (5.904341623, 12, 5.904341623),
        (7.714394096, 12, 3.19540666),
        (8.35, 12, 0),
        (7.714394096, 12, -3.19540666),
        (5.904341623, 12, -5.904341623),
        (3.19540666, 12, -7.714394096),
        (0, 12, -8.35),
    ]]
    chamfer(chamfer5_edges, length=CHAMFER5_SIZE)


solid = part.part
